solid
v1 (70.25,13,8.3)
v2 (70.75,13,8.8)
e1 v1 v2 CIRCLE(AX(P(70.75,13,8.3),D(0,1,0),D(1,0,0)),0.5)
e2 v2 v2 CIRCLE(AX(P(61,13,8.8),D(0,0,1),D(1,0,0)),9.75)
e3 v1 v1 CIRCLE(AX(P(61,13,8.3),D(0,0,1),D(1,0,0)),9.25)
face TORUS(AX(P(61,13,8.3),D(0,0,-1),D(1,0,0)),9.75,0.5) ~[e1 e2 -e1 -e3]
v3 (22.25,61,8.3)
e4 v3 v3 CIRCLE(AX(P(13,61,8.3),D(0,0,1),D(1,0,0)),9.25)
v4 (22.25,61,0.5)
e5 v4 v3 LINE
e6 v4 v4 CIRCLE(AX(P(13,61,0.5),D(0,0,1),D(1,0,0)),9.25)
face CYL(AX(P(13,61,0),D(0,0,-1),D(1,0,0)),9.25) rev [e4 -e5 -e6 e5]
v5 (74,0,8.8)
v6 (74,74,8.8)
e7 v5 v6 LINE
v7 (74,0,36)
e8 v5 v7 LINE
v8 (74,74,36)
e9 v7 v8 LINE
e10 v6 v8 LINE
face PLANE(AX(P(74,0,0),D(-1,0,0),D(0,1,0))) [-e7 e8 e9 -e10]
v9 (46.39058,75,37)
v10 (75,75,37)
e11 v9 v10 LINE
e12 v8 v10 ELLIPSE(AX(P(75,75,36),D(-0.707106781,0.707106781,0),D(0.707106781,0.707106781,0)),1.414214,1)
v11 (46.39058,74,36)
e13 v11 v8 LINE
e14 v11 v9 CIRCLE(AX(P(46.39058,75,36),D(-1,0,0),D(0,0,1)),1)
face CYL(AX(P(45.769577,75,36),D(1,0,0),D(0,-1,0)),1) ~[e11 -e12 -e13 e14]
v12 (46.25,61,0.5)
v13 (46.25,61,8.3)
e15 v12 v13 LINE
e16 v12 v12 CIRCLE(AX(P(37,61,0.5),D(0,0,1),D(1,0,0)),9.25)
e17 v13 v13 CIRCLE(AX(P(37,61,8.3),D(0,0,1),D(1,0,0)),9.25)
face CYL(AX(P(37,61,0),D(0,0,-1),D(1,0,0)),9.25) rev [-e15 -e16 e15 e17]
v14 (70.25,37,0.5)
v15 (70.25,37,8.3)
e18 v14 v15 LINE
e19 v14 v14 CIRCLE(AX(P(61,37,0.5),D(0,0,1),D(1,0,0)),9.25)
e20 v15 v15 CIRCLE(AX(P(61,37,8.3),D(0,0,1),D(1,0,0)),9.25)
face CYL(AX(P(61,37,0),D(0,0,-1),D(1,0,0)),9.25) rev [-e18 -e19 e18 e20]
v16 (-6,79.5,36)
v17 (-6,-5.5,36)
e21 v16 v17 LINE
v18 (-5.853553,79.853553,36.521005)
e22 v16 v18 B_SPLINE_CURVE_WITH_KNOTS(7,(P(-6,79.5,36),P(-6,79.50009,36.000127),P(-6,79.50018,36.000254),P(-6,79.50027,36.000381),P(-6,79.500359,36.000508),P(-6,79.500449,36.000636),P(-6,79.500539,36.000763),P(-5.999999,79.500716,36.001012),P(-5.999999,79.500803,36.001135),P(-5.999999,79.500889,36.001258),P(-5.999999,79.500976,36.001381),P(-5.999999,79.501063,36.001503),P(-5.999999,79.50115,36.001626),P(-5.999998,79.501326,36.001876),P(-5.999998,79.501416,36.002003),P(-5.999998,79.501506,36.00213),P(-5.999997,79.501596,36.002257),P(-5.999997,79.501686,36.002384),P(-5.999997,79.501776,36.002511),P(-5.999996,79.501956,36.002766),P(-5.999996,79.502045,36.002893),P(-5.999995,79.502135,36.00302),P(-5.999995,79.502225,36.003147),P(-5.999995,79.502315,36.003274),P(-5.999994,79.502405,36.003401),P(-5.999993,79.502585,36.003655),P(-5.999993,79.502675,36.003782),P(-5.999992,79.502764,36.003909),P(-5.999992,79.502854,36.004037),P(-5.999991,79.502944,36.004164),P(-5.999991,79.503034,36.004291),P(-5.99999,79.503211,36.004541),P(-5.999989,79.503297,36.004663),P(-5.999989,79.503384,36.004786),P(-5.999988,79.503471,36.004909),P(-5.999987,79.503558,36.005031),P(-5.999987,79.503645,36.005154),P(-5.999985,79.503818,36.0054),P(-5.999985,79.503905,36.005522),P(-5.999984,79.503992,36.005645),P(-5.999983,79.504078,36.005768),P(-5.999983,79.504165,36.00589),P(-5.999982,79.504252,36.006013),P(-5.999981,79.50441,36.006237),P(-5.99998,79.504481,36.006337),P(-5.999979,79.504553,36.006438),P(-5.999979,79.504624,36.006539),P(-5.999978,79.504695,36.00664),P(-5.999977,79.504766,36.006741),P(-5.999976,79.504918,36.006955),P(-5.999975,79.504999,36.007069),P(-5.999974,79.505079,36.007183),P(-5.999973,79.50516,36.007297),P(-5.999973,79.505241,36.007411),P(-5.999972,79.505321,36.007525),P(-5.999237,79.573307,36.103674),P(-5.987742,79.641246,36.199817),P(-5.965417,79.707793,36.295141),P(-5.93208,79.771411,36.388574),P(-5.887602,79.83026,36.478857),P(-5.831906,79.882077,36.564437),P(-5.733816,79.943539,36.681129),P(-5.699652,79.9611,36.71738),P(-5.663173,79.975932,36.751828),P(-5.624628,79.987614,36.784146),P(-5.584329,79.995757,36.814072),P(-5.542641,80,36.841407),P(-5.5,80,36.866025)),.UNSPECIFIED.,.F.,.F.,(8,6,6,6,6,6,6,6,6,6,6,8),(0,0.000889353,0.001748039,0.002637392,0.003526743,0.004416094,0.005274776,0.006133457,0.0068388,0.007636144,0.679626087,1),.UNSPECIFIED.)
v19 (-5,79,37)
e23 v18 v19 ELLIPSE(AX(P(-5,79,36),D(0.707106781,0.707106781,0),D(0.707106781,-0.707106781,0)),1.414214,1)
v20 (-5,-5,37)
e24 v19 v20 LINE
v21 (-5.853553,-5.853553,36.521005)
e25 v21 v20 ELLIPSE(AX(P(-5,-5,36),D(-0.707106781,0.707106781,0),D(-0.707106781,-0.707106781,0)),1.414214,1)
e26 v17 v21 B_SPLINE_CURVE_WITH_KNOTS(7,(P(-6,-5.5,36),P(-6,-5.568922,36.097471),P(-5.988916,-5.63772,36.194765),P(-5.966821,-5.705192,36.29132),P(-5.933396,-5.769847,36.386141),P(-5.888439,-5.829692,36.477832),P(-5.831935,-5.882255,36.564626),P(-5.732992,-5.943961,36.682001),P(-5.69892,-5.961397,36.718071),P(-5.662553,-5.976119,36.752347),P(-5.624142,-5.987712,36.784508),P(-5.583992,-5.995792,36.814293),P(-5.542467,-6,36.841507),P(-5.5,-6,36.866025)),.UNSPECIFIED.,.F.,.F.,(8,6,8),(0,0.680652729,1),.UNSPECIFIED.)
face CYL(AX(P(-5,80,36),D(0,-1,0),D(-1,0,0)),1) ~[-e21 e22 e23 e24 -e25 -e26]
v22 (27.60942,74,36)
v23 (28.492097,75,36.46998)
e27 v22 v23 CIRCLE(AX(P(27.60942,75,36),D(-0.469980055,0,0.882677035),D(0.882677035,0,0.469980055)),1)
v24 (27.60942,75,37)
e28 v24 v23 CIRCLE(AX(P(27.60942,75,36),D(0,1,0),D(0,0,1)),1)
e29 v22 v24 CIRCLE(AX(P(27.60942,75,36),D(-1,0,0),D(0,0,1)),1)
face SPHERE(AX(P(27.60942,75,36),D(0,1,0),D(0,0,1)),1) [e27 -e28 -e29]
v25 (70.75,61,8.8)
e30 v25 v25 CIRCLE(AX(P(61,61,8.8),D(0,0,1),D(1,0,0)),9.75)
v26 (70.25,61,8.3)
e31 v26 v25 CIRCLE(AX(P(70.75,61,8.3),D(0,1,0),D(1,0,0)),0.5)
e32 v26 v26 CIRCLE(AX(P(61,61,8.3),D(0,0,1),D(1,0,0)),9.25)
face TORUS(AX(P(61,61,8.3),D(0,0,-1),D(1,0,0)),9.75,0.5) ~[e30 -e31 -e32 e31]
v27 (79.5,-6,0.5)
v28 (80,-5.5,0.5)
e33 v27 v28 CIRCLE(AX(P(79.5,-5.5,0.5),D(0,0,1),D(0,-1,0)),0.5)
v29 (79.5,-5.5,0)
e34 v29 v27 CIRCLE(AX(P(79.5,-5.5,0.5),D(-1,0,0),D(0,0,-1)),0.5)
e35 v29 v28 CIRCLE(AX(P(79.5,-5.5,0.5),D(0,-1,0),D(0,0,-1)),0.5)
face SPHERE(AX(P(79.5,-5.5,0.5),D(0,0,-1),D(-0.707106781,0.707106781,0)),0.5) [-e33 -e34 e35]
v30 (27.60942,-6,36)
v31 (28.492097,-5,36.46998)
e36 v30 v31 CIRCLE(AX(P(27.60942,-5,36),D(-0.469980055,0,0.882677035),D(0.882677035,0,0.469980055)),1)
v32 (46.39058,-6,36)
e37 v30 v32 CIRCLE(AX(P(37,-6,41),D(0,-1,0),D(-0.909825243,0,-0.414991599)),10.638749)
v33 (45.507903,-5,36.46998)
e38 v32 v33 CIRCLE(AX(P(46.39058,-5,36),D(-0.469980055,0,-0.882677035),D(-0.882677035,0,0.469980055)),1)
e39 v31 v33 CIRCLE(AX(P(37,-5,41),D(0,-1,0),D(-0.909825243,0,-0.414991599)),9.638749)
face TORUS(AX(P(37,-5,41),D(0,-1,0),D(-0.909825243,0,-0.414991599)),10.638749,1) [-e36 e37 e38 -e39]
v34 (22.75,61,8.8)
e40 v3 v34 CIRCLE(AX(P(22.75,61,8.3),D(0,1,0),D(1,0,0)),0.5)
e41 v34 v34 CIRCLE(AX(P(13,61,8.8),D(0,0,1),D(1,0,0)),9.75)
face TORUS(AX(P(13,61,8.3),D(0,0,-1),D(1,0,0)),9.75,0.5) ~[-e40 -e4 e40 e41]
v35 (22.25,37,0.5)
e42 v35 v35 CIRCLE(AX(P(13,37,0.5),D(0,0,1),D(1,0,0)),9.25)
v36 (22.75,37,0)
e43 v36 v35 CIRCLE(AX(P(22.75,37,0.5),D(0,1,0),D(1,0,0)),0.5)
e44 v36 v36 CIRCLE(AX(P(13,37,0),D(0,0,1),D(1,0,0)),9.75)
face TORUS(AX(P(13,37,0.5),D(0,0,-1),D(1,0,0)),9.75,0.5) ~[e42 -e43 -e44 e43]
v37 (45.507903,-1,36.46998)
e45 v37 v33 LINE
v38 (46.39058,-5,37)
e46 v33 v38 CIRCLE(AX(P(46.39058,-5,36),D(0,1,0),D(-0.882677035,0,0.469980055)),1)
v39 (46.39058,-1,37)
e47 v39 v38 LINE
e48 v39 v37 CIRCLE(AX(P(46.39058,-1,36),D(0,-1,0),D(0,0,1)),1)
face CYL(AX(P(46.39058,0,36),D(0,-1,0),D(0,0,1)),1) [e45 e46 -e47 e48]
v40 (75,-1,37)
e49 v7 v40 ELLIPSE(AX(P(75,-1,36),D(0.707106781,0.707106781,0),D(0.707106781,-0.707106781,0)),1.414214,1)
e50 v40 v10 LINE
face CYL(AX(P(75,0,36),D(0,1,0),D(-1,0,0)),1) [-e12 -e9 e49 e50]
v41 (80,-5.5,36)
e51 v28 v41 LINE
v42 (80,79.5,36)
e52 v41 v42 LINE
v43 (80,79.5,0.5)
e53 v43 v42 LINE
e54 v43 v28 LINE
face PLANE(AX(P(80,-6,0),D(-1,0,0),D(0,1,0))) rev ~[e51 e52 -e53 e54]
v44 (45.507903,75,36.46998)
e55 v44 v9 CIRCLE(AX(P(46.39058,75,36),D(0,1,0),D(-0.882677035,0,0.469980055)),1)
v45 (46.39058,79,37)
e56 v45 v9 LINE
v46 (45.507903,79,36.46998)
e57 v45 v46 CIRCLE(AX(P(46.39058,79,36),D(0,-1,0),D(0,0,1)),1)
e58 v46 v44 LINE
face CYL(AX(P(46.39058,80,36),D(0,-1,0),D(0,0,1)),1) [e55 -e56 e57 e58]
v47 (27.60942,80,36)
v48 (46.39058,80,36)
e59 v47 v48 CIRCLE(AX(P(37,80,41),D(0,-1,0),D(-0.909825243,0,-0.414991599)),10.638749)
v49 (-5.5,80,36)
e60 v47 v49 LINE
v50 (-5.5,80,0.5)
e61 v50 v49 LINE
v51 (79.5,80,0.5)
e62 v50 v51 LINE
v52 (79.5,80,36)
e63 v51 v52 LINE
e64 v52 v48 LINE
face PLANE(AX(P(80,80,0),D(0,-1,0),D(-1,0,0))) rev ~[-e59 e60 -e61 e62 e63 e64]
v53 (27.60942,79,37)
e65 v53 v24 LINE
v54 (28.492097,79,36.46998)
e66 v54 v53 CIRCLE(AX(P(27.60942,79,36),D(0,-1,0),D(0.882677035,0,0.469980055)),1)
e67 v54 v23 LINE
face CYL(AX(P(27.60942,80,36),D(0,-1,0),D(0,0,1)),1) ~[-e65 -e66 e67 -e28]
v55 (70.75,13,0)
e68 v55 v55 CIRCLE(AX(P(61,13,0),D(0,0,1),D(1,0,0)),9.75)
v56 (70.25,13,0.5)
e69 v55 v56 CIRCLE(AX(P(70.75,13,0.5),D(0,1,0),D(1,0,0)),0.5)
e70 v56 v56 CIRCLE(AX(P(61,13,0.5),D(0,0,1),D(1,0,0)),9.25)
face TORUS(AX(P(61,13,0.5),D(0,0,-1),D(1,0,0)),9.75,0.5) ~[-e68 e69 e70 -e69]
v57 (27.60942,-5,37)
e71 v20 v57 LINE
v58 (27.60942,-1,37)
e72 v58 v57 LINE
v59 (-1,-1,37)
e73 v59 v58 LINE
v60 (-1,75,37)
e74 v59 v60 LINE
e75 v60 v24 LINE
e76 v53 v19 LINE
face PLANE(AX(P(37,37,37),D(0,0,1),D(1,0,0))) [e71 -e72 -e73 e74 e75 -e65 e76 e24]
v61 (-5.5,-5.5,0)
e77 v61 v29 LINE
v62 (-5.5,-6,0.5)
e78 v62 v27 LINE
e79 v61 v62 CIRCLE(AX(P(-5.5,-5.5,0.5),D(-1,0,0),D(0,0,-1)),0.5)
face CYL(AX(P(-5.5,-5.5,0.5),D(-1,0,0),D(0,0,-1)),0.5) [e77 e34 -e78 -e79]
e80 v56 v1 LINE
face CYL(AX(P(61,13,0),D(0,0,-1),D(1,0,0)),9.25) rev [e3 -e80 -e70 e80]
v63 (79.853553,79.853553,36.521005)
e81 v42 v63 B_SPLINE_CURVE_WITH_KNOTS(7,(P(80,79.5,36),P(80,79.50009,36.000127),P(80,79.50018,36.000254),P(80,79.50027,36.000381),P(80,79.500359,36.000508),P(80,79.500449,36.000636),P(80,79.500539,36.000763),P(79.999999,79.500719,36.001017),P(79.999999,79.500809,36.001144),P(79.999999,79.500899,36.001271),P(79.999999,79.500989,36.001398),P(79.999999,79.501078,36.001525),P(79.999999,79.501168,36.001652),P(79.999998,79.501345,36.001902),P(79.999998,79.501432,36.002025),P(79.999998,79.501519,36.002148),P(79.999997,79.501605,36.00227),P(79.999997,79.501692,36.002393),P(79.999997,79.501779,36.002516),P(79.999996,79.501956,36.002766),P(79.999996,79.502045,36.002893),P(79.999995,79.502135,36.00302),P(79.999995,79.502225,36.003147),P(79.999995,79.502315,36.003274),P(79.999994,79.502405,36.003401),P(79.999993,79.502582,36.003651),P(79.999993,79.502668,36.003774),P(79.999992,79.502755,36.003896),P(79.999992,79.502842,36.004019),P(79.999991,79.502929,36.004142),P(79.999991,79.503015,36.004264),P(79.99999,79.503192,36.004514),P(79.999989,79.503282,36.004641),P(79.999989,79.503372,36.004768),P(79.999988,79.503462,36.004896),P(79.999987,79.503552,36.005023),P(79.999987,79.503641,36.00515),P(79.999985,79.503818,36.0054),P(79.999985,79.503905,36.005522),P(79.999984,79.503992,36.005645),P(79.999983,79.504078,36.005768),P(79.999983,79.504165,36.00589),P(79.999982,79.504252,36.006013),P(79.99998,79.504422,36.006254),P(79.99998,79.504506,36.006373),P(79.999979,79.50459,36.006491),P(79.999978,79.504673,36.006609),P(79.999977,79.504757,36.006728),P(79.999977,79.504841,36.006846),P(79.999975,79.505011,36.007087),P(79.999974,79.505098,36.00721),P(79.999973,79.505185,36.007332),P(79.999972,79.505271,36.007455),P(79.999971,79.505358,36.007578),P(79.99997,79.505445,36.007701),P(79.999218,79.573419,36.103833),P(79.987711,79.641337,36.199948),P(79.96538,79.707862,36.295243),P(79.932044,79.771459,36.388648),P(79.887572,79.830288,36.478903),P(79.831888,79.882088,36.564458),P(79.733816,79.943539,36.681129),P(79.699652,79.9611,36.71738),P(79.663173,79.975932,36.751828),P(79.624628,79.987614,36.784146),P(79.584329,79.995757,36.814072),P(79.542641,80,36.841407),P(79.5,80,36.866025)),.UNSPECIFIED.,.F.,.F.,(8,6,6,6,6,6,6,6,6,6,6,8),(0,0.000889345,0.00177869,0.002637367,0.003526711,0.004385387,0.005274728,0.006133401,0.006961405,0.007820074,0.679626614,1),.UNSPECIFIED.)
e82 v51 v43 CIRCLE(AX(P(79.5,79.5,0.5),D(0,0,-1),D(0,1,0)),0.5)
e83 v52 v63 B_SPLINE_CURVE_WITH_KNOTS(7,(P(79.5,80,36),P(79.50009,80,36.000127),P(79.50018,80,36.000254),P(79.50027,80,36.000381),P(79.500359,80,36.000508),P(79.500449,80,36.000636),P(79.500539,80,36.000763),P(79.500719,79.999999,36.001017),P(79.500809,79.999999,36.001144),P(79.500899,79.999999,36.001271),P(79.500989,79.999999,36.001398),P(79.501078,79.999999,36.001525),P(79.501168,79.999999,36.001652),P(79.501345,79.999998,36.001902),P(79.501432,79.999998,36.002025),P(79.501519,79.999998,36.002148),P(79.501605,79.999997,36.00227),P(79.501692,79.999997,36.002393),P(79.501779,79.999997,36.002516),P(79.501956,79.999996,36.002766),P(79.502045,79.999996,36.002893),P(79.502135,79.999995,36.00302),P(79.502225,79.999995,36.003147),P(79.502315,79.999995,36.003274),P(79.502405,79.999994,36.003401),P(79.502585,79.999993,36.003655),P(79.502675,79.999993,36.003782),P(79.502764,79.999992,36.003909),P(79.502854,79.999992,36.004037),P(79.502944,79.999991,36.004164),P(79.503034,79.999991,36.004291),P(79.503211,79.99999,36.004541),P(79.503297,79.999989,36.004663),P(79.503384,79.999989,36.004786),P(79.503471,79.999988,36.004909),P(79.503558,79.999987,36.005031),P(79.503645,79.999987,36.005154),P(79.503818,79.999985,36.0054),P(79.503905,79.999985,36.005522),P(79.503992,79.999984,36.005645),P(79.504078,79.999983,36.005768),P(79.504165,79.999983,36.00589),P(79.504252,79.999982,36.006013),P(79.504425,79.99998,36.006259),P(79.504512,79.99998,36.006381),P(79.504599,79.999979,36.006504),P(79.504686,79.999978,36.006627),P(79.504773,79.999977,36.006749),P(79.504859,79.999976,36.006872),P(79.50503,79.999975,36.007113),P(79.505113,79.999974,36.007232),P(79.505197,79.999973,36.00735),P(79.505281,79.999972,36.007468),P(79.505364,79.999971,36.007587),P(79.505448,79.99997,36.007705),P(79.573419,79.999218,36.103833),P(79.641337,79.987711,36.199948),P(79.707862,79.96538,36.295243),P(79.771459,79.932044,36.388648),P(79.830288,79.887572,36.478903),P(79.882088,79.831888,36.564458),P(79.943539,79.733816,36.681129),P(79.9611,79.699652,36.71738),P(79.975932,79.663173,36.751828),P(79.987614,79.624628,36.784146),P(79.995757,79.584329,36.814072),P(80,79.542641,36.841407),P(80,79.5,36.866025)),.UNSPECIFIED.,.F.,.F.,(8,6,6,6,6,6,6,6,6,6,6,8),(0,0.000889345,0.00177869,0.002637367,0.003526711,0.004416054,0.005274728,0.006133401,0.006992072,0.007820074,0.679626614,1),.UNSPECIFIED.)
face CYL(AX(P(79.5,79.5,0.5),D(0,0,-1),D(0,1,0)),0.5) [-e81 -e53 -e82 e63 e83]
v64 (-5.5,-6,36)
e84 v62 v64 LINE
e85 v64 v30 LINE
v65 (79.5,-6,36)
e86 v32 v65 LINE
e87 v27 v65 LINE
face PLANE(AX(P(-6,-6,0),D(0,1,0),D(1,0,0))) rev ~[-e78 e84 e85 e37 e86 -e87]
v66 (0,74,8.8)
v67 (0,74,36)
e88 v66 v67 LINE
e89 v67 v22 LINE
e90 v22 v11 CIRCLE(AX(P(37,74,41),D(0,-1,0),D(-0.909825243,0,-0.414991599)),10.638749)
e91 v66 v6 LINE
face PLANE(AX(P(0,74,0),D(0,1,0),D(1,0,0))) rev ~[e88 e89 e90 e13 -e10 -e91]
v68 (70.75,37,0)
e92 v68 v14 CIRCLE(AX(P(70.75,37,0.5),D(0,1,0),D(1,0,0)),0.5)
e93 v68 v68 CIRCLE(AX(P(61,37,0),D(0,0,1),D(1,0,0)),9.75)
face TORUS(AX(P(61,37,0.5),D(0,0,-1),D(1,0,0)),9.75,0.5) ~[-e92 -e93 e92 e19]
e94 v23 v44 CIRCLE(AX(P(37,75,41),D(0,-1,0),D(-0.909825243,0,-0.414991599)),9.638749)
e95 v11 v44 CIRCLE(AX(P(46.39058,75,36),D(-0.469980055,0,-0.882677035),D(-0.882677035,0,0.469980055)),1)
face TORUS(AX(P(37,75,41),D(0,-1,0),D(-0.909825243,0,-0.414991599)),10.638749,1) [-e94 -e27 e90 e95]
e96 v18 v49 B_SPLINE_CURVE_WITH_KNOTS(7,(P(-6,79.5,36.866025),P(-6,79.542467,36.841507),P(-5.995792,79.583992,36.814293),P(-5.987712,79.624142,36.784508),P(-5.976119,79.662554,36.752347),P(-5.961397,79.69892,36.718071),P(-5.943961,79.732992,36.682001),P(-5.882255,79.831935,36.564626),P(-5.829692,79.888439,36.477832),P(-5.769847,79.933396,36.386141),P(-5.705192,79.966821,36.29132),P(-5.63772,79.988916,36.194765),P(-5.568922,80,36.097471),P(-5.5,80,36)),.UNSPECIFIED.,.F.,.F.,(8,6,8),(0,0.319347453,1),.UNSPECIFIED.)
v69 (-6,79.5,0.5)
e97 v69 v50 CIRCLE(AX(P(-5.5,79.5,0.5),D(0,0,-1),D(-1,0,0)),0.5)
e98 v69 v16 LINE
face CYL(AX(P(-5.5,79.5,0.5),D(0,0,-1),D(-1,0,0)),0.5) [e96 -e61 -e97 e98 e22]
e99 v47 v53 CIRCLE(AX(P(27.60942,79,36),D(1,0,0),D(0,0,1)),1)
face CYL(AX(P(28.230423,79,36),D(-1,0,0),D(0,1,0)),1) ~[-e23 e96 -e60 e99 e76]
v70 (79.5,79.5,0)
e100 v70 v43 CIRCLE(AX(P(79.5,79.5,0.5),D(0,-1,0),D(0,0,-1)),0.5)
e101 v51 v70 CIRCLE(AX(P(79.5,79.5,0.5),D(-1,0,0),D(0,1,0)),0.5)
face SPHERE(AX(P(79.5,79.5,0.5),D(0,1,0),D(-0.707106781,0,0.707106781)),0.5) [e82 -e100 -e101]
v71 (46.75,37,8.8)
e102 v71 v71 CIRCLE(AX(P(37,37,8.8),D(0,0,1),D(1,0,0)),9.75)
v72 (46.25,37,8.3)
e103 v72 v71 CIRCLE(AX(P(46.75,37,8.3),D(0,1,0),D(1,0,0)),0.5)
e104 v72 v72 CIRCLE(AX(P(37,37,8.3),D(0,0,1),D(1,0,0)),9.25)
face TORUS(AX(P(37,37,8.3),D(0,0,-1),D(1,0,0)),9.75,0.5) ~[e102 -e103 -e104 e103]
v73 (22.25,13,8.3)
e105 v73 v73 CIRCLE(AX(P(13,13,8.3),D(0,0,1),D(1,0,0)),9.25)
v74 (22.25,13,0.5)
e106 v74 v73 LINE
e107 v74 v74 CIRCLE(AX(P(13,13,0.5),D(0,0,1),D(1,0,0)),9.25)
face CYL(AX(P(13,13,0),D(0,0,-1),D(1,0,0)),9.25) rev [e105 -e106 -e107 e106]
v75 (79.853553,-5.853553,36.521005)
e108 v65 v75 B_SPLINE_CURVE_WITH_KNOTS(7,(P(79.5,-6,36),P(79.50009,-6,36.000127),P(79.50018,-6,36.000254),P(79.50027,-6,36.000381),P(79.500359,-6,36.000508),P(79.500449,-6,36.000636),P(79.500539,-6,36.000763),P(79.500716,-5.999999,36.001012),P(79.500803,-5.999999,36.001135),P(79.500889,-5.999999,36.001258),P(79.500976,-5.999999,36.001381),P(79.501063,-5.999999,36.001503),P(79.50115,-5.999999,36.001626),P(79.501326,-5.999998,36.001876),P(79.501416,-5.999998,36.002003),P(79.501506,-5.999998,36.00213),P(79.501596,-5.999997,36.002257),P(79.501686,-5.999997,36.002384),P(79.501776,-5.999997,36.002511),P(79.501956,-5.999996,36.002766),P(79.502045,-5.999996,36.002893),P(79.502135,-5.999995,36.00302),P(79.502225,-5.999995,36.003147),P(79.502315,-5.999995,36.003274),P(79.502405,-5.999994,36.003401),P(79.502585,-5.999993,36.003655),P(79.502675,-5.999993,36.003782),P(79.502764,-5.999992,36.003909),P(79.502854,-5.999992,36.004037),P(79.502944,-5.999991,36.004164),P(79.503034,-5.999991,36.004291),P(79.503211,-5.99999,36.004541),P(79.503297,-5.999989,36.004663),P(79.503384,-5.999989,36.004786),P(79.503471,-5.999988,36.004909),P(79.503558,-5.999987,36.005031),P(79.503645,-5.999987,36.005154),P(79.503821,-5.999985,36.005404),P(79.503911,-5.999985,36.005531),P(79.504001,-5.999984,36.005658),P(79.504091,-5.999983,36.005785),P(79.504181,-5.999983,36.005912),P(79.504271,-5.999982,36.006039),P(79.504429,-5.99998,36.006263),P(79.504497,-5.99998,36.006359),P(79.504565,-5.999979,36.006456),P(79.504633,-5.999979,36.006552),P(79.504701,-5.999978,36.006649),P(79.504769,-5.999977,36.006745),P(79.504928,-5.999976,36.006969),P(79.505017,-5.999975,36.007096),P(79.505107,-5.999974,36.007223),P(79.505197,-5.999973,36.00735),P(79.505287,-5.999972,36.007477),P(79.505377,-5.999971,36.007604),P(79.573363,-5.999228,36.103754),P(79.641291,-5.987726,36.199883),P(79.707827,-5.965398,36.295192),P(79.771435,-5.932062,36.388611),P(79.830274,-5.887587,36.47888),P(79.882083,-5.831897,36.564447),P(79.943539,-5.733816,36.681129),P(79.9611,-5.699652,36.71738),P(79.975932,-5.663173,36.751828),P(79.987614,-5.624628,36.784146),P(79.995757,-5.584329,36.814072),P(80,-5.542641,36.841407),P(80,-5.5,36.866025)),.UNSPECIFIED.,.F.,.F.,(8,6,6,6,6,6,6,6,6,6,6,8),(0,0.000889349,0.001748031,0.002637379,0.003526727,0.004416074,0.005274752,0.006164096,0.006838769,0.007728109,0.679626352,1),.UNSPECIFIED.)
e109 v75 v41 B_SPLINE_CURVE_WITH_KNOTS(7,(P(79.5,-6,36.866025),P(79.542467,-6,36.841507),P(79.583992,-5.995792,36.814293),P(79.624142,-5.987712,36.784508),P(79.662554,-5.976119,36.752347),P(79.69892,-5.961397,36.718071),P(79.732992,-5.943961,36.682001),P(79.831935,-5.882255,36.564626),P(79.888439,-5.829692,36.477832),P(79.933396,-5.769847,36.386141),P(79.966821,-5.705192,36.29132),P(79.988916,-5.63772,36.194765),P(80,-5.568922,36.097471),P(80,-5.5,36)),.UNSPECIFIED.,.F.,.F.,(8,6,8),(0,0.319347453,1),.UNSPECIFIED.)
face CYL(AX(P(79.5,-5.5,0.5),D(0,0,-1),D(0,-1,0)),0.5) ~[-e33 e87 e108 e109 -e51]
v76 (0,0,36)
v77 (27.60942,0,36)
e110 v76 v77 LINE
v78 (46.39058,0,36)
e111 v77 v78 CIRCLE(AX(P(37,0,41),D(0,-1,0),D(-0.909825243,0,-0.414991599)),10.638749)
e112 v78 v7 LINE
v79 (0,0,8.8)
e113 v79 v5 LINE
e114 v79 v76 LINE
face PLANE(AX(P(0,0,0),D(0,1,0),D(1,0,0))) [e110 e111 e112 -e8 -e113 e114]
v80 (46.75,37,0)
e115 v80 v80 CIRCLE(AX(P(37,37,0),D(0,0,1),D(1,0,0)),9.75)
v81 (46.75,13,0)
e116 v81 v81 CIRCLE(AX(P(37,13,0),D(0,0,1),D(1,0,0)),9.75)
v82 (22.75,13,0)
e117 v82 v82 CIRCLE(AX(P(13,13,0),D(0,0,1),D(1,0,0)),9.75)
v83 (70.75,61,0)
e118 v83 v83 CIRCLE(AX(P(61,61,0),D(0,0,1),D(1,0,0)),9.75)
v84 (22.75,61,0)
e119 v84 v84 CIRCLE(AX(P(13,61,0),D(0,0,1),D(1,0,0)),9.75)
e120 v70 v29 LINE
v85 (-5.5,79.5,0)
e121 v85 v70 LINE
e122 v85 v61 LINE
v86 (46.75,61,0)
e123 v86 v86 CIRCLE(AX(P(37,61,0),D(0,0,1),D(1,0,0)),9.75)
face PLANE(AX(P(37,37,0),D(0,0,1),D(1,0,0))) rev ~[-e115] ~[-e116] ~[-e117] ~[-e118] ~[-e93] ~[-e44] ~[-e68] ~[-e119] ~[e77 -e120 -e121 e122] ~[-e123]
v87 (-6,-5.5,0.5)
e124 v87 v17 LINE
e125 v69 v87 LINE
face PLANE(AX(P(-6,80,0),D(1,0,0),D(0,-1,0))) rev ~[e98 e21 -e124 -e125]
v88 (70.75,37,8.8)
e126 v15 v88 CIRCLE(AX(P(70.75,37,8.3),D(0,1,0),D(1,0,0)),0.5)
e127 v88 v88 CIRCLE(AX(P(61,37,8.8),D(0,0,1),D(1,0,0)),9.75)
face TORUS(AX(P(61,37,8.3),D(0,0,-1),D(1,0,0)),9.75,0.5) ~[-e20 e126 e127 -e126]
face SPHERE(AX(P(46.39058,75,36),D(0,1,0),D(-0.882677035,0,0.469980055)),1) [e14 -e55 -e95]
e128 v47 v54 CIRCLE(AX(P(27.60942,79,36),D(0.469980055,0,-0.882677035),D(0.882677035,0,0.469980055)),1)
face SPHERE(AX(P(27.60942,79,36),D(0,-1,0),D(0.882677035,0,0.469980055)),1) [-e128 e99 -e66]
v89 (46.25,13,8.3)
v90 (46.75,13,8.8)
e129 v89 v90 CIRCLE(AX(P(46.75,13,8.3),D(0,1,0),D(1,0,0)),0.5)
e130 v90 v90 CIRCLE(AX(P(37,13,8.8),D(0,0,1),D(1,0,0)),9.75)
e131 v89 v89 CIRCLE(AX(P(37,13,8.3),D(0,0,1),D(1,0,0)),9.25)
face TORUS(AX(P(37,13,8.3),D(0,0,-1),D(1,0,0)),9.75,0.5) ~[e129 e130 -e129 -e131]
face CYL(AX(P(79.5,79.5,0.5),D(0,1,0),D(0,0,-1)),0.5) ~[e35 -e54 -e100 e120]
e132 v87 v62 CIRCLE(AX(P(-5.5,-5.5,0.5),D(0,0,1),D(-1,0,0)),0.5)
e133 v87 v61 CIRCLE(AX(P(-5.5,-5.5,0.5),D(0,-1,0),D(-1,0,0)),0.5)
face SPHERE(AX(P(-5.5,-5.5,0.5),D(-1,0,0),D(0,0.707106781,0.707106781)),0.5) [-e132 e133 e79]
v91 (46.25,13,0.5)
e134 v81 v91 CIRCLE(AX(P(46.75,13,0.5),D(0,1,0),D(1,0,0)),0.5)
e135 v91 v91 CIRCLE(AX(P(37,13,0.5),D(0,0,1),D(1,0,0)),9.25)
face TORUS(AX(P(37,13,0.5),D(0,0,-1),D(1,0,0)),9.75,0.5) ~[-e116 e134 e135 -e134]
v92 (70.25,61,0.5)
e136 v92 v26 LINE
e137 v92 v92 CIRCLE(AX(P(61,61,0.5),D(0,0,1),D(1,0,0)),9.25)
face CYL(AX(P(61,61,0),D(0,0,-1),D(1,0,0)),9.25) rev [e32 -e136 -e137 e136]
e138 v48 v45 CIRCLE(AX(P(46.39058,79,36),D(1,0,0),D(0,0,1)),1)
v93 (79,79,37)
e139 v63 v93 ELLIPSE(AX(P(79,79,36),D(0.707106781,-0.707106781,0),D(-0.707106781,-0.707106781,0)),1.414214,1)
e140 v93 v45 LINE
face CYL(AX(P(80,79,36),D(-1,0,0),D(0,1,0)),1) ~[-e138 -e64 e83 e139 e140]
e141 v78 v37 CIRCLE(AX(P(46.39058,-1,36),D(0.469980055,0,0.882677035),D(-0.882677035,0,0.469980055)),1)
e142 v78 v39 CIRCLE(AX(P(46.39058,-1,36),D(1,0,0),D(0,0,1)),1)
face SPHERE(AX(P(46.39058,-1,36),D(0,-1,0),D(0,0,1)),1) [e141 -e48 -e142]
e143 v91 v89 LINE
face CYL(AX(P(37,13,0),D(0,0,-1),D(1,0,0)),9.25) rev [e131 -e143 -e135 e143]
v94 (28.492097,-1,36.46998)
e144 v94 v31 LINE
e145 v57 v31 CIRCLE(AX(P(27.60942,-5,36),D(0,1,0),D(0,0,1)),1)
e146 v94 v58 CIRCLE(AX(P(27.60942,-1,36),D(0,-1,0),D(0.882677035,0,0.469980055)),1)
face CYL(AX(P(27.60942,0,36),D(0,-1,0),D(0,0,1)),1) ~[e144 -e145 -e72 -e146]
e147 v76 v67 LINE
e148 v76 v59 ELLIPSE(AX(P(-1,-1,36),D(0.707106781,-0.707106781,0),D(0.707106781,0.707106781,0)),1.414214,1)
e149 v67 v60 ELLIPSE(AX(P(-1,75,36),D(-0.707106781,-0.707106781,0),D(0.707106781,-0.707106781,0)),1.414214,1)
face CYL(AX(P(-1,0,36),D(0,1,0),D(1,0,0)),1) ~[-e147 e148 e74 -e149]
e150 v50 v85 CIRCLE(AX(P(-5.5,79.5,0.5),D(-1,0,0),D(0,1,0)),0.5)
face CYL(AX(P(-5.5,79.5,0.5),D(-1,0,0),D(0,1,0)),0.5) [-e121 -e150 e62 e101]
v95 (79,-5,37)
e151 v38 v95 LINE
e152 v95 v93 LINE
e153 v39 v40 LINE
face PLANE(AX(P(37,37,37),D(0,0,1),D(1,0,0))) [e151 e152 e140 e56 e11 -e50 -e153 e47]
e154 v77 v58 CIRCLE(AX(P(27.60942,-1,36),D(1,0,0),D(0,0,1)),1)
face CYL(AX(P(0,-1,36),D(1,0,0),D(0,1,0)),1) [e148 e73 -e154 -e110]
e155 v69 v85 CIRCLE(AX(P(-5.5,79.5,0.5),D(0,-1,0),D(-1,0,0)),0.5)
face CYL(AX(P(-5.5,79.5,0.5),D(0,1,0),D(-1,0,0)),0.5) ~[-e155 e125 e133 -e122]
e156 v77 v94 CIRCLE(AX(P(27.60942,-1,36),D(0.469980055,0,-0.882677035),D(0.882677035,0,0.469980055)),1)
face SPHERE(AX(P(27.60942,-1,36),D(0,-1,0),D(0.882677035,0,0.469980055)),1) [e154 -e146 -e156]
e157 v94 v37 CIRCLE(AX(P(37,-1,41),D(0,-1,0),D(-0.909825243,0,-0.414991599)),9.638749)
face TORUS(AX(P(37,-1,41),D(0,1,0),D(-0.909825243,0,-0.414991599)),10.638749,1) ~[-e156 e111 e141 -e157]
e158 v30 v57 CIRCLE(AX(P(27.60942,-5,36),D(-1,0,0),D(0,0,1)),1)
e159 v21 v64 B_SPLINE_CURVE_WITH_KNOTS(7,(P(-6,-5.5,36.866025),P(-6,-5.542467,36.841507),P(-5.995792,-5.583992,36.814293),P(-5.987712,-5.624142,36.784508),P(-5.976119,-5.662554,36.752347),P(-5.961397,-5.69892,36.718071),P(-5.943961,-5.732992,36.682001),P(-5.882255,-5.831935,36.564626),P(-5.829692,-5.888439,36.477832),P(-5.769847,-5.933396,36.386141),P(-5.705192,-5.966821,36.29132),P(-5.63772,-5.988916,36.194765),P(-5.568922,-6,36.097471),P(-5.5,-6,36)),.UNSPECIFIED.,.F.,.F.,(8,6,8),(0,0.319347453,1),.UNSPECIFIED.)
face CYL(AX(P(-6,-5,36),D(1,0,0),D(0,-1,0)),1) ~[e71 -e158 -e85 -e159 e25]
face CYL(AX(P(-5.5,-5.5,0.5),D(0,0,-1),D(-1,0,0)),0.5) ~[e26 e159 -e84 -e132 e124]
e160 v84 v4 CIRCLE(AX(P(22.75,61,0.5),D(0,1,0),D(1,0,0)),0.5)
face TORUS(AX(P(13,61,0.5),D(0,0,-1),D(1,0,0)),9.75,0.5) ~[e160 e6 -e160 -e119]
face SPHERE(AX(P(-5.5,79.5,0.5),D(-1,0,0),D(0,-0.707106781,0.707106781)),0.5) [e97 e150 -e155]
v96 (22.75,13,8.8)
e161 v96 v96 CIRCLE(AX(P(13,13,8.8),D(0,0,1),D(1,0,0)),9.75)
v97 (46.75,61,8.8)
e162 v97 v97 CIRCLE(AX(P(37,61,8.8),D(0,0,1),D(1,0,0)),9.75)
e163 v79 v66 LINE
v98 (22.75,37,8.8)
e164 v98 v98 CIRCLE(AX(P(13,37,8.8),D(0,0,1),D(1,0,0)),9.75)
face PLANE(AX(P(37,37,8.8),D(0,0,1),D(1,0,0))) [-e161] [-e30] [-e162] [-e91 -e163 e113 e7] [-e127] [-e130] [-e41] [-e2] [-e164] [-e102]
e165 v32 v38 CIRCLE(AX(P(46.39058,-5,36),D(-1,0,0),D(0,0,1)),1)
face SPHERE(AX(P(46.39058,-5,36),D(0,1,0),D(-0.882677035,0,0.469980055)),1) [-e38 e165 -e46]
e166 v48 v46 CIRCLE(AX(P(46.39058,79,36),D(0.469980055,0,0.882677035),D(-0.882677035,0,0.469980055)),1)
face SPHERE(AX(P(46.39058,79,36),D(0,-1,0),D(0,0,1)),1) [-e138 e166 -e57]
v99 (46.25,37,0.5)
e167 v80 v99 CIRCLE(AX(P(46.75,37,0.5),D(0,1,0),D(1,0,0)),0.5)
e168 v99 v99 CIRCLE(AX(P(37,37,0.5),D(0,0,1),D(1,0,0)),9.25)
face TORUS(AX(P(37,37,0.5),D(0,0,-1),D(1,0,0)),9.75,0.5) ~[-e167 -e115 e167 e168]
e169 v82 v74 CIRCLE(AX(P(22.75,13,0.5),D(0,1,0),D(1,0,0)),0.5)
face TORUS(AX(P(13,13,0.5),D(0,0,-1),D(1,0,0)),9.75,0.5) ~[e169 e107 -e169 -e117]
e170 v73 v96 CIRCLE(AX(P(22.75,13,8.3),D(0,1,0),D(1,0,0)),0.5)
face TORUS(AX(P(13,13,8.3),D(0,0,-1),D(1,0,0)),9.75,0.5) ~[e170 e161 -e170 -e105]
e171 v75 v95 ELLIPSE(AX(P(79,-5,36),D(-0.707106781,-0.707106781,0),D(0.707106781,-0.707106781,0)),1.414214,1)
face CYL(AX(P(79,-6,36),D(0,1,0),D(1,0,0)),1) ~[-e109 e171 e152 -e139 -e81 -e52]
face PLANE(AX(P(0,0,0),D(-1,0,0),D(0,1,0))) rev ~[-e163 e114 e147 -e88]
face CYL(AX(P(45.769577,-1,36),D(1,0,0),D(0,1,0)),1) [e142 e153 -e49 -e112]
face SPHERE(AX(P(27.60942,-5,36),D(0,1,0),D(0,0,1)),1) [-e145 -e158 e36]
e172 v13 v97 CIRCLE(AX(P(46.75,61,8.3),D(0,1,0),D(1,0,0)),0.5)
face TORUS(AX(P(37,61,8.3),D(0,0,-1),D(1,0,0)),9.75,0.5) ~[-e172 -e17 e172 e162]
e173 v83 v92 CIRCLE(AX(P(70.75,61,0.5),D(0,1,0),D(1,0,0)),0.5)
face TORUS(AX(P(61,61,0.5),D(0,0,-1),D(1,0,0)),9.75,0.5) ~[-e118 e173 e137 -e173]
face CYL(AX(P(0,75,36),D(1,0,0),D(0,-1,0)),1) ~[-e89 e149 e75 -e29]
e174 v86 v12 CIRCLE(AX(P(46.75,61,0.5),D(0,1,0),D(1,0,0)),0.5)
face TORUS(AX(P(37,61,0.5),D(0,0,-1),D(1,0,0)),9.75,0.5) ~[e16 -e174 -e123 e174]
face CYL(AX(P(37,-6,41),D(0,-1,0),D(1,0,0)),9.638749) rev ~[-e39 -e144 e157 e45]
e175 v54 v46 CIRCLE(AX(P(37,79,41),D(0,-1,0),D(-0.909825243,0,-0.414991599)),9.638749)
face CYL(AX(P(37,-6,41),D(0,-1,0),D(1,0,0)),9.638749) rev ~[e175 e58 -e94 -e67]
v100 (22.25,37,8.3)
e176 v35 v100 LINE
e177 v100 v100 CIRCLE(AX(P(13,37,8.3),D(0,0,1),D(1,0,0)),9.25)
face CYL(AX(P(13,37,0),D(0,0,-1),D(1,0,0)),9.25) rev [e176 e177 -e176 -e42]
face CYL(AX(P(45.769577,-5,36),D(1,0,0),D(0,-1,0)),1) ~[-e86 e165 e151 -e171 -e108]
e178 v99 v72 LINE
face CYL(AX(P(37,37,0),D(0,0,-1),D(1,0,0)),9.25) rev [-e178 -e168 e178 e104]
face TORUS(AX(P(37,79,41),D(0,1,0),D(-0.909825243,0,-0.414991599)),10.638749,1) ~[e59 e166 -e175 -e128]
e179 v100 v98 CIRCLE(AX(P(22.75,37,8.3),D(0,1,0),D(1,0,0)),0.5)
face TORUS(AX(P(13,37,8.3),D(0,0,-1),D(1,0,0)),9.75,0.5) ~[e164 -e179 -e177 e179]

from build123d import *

# Parameters (mm, degrees)
F0_W         = 74
F0_H         = 74
F1_DEPTH     = 37
F0_R         = 9.25
F2_DEPTH     = 8.8
F3_R         = 9.6387493407
F4_DEPTH     = 800
F5_R         = 1
F6_T1_DEPTH  = 36.75
F6_T3_DEPTH  = 85
F6_T5_DEPTH  = 85
F6_S9_W      = 0.51
F6_S9_H      = 0.51
F6_T10_DEPTH = 0.51
F6_S15_W     = 0.51
F6_S15_H     = 0.51
F6_T16_DEPTH = 0.51
F6_S21_W     = 0.51
F6_S21_H     = 0.51
F6_T22_DEPTH = 0.51
F6_S27_W     = 0.51
F6_S27_H     = 0.51
F6_T28_DEPTH = 0.51
F7_R         = 0.5


# Not quite as in the source:
# - a fillet or chamfer that OpenCascade refuses, or shapes differently, is made with other operations: its cross-section is extruded or revolved along the edge and cut away or added


with BuildPart() as f1:
    # F0 (on Top) → F1 (new body)
    with BuildSketch(Plane.XY):
        Polygon((-6, 80), (-6, 0), (-6, -6), (80, -6), (80, 80), align=None)
        with Locations((37, 37)):
            Rectangle(F0_W, F0_H, mode=Mode.SUBTRACT)
    extrude(amount=F1_DEPTH)

    # F0 (on Top) → F2 (join)
    with BuildSketch(Plane.XY):
        with Locations((37, 37)):
            Rectangle(F0_W, F0_H)
        with Locations((13, 13)):
            Circle(F0_R, mode=Mode.SUBTRACT)
        with Locations((37, 13)):
            Circle(F0_R, mode=Mode.SUBTRACT)
        with Locations((61, 13)):
            Circle(F0_R, mode=Mode.SUBTRACT)
        with Locations((13, 37)):
            Circle(F0_R, mode=Mode.SUBTRACT)
        with Locations((13, 61)):
            Circle(F0_R, mode=Mode.SUBTRACT)
        with Locations((37, 37)):
            Circle(F0_R, mode=Mode.SUBTRACT)
        with Locations((61, 37)):
            Circle(F0_R, mode=Mode.SUBTRACT)
        with Locations((37, 61)):
            Circle(F0_R, mode=Mode.SUBTRACT)
        with Locations((61, 61)):
            Circle(F0_R, mode=Mode.SUBTRACT)
    extrude(amount=F2_DEPTH)

    # F3 (on face) → F4 (cut)
    with BuildSketch(Plane.XZ.offset(6)):
        with Locations((37, 41)):
            Circle(F3_R)
    extrude(amount=-F4_DEPTH, mode=Mode.SUBTRACT)

    # F5
    f5_edges = [f1.edges().sort_by_distance(p)[0] for p in [
        (-6, 37, 37),
        (11.115211, 80, 37),
        (28.230423, 77, 37),
        (14.115211, 74, 37),
        (0, 37, 37),
        (14.115211, 0, 37),
        (28.230423, -3, 37),
        (11.115211, -6, 37),
        (62.884789, -6, 37),
        (45.769577, -3, 37),
        (59.884789, 0, 37),
        (74, 37, 37),
        (59.884789, 74, 37),
        (45.769577, 77, 37),
        (62.884789, 80, 37),
        (80, 37, 37),
        (37, -6, 31.361251),
        (37, 0, 31.361251),
        (37, 74, 31.361251),
        (37, 80, 31.361251),
    ]]
    fillet(f5_edges, radius=F5_R)

    # F6: fillet of radius 0.5 on 16 edges, made by hand

    # F6_s2 → F6_t1 (cut)
    with BuildSketch(Plane.XY.offset(0.5)):
        with BuildLine():
            ThreePointArc((79.5, -6), (79.8535533906, -5.8535533906), (80, -5.5))
            Line((80, -5.5), (80, -6))
            Line((80, -6), (79.5, -6))
        make_face()
        with BuildLine():
            ThreePointArc((-6, -5.5), (-5.8535533906, -5.8535533906), (-5.5, -6))
            Line((-5.5, -6), (-6, -6))
            Line((-6, -6), (-6, -5.5))
        make_face()
        with BuildLine():
            ThreePointArc((79.5, 80), (79.8535533906, 79.8535533906), (80, 79.5))
            Line((80, 79.5), (80, 80))
            Line((80, 80), (79.5, 80))
        make_face()
        with BuildLine():
            ThreePointArc((-6, 79.5), (-5.8535533906, 79.8535533906), (-5.5, 80))
            Line((-5.5, 80), (-6, 80))
            Line((-6, 80), (-6, 79.5))
        make_face()
    extrude(amount=F6_T1_DEPTH, mode=Mode.SUBTRACT)

    # F6_s4 → F6_t3 (cut)
    with BuildSketch(Plane.YZ.offset(-5.5)):
        with BuildLine():
            ThreePointArc((-5.5, 0), (-5.8535533906, 0.1464466094), (-6, 0.5))
            Line((-6, 0.5), (-6, 0))
            Line((-6, 0), (-5.5, 0))
        make_face()
        with BuildLine():
            ThreePointArc((80, 0.5), (79.8535533906, 0.1464466094), (79.5, 0))
            Line((79.5, 0), (80, 0))
            Line((80, 0), (80, 0.5))
        make_face()
    extrude(amount=F6_T3_DEPTH, mode=Mode.SUBTRACT)

    # F6_s6 → F6_t5 (cut)
    with BuildSketch(Plane.XZ.offset(-79.5)):
        with BuildLine():
            ThreePointArc((79.5, 0), (79.8535533906, 0.1464466094), (80, 0.5))
            Line((80, 0.5), (80, 0))
            Line((80, 0), (79.5, 0))
        make_face()
        with BuildLine():
            ThreePointArc((-6, 0.5), (-5.8535533906, 0.1464466094), (-5.5, 0))
            Line((-5.5, 0), (-6, 0))
            Line((-6, 0), (-6, 0.5))
        make_face()
    extrude(amount=F6_T5_DEPTH, mode=Mode.SUBTRACT)


with BuildPart() as f6_tool8:
    # F6_s9 → F6_t10 (new body)
    with BuildSketch(Plane.XY.offset(0.5)):
        with Locations((79.755, -5.755)):
            Rectangle(F6_S9_W, F6_S9_H)
    extrude(amount=-F6_T10_DEPTH)

    # F6_s11 → F6_t12 (revolve, cut)
    with BuildSketch(Plane(origin=(79.5, -5.5, 0.5), x_dir=(-0.7071067812, 0.7071067812, 0), z_dir=(-0.7071067812, -0.7071067812, 0))):
        with BuildLine():
            ThreePointArc((0, -0.5), (0.5, 0), (0, 0.5))
            Line((0, 0.5), (0, -0.5))
        make_face()
    revolve(axis=Axis((79.5, -5.5, 0.5), (0, 0, -1)), mode=Mode.SUBTRACT)


with BuildPart() as f1_1:
    add(f1.part)

    # F6_t7: cut F6_tool8
    add(f6_tool8.part, mode=Mode.SUBTRACT)


with BuildPart() as f6_tool14:
    # F6_s15 → F6_t16 (new body)
    with BuildSketch(Plane.YZ.offset(-5.5)):
        with Locations((-5.755, 0.245)):
            Rectangle(F6_S15_W, F6_S15_H)
    extrude(amount=-F6_T16_DEPTH)

    # F6_s17 → F6_t18 (revolve, cut)
    with BuildSketch(Plane(origin=(-5.5, -5.5, 0.5), x_dir=(0, 0.7071067812, 0.7071067812), z_dir=(0, -0.7071067812, 0.7071067812))):
        with BuildLine():
            ThreePointArc((0, -0.5), (0.5, 0), (0, 0.5))
            Line((0, 0.5), (0, -0.5))
        make_face()
    revolve(axis=Axis((-5.5, -5.5, 0.5), (-1, 0, 0)), mode=Mode.SUBTRACT)


with BuildPart() as f1_2:
    add(f1_1.part)

    # F6_t13: cut F6_tool14
    add(f6_tool14.part, mode=Mode.SUBTRACT)


with BuildPart() as f6_tool20:
    # F6_s21 → F6_t22 (new body)
    with BuildSketch(Plane.XZ.offset(-79.5)):
        with Locations((79.755, 0.245)):
            Rectangle(F6_S21_W, F6_S21_H)
    extrude(amount=-F6_T22_DEPTH)

    # F6_s23 → F6_t24 (revolve, cut)
    with BuildSketch(Plane(origin=(79.5, 79.5, 0.5), x_dir=(-0.7071067812, 0, 0.7071067812), z_dir=(-0.7071067812, 0, -0.7071067812))):
        with BuildLine():
            ThreePointArc((0, -0.5), (0.5, 0), (0, 0.5))
            Line((0, 0.5), (0, -0.5))
        make_face()
    revolve(axis=Axis((79.5, 79.5, 0.5), (0, 1, 0)), mode=Mode.SUBTRACT)


with BuildPart() as f1_3:
    add(f1_2.part)

    # F6_t19: cut F6_tool20
    add(f6_tool20.part, mode=Mode.SUBTRACT)


with BuildPart() as f6_tool26:
    # F6_s27 → F6_t28 (new body)
    with BuildSketch(Plane.YZ.offset(-5.5)):
        with Locations((79.755, 0.245)):
            Rectangle(F6_S27_W, F6_S27_H)
    extrude(amount=-F6_T28_DEPTH)

    # F6_s29 → F6_t30 (revolve, cut)
    with BuildSketch(Plane(origin=(-5.5, 79.5, 0.5), x_dir=(0, -0.7071067812, 0.7071067812), z_dir=(0, -0.7071067812, -0.7071067812))):
        with BuildLine():
            ThreePointArc((0, -0.5), (0.5, 0), (0, 0.5))
            Line((0, 0.5), (0, -0.5))
        make_face()
    revolve(axis=Axis((-5.5, 79.5, 0.5), (-1, 0, 0)), mode=Mode.SUBTRACT)


with BuildPart() as f1_4:
    add(f1_3.part)

    # F6_t25: cut F6_tool26
    add(f6_tool26.part, mode=Mode.SUBTRACT)

    # F7
    f7_edges = [f1_4.edges().sort_by_distance(p)[0] for p in [
        (70.25, 13, 4.4),
        (51.75, 13, 0),
        (51.75, 13, 8.8),
        (70.25, 37, 4.4),
        (51.75, 37, 0),
        (51.75, 37, 8.8),
        (70.25, 61, 4.4),
        (51.75, 61, 0),
        (51.75, 61, 8.8),
        (46.25, 61, 4.4),
        (27.75, 61, 0),
        (27.75, 61, 8.8),
        (46.25, 37, 4.4),
        (27.75, 37, 0),
        (27.75, 37, 8.8),
        (46.25, 13, 4.4),
        (27.75, 13, 0),
        (27.75, 13, 8.8),
        (22.25, 13, 4.4),
        (3.75, 13, 0),
        (3.75, 13, 8.8),
        (22.25, 37, 4.4),
        (3.75, 37, 0),
        (3.75, 37, 8.8),
        (22.25, 61, 4.4),
        (3.75, 61, 0),
        (3.75, 61, 8.8),
    ]]
    fillet(f7_edges, radius=F7_R)


solid = f1_4.part
